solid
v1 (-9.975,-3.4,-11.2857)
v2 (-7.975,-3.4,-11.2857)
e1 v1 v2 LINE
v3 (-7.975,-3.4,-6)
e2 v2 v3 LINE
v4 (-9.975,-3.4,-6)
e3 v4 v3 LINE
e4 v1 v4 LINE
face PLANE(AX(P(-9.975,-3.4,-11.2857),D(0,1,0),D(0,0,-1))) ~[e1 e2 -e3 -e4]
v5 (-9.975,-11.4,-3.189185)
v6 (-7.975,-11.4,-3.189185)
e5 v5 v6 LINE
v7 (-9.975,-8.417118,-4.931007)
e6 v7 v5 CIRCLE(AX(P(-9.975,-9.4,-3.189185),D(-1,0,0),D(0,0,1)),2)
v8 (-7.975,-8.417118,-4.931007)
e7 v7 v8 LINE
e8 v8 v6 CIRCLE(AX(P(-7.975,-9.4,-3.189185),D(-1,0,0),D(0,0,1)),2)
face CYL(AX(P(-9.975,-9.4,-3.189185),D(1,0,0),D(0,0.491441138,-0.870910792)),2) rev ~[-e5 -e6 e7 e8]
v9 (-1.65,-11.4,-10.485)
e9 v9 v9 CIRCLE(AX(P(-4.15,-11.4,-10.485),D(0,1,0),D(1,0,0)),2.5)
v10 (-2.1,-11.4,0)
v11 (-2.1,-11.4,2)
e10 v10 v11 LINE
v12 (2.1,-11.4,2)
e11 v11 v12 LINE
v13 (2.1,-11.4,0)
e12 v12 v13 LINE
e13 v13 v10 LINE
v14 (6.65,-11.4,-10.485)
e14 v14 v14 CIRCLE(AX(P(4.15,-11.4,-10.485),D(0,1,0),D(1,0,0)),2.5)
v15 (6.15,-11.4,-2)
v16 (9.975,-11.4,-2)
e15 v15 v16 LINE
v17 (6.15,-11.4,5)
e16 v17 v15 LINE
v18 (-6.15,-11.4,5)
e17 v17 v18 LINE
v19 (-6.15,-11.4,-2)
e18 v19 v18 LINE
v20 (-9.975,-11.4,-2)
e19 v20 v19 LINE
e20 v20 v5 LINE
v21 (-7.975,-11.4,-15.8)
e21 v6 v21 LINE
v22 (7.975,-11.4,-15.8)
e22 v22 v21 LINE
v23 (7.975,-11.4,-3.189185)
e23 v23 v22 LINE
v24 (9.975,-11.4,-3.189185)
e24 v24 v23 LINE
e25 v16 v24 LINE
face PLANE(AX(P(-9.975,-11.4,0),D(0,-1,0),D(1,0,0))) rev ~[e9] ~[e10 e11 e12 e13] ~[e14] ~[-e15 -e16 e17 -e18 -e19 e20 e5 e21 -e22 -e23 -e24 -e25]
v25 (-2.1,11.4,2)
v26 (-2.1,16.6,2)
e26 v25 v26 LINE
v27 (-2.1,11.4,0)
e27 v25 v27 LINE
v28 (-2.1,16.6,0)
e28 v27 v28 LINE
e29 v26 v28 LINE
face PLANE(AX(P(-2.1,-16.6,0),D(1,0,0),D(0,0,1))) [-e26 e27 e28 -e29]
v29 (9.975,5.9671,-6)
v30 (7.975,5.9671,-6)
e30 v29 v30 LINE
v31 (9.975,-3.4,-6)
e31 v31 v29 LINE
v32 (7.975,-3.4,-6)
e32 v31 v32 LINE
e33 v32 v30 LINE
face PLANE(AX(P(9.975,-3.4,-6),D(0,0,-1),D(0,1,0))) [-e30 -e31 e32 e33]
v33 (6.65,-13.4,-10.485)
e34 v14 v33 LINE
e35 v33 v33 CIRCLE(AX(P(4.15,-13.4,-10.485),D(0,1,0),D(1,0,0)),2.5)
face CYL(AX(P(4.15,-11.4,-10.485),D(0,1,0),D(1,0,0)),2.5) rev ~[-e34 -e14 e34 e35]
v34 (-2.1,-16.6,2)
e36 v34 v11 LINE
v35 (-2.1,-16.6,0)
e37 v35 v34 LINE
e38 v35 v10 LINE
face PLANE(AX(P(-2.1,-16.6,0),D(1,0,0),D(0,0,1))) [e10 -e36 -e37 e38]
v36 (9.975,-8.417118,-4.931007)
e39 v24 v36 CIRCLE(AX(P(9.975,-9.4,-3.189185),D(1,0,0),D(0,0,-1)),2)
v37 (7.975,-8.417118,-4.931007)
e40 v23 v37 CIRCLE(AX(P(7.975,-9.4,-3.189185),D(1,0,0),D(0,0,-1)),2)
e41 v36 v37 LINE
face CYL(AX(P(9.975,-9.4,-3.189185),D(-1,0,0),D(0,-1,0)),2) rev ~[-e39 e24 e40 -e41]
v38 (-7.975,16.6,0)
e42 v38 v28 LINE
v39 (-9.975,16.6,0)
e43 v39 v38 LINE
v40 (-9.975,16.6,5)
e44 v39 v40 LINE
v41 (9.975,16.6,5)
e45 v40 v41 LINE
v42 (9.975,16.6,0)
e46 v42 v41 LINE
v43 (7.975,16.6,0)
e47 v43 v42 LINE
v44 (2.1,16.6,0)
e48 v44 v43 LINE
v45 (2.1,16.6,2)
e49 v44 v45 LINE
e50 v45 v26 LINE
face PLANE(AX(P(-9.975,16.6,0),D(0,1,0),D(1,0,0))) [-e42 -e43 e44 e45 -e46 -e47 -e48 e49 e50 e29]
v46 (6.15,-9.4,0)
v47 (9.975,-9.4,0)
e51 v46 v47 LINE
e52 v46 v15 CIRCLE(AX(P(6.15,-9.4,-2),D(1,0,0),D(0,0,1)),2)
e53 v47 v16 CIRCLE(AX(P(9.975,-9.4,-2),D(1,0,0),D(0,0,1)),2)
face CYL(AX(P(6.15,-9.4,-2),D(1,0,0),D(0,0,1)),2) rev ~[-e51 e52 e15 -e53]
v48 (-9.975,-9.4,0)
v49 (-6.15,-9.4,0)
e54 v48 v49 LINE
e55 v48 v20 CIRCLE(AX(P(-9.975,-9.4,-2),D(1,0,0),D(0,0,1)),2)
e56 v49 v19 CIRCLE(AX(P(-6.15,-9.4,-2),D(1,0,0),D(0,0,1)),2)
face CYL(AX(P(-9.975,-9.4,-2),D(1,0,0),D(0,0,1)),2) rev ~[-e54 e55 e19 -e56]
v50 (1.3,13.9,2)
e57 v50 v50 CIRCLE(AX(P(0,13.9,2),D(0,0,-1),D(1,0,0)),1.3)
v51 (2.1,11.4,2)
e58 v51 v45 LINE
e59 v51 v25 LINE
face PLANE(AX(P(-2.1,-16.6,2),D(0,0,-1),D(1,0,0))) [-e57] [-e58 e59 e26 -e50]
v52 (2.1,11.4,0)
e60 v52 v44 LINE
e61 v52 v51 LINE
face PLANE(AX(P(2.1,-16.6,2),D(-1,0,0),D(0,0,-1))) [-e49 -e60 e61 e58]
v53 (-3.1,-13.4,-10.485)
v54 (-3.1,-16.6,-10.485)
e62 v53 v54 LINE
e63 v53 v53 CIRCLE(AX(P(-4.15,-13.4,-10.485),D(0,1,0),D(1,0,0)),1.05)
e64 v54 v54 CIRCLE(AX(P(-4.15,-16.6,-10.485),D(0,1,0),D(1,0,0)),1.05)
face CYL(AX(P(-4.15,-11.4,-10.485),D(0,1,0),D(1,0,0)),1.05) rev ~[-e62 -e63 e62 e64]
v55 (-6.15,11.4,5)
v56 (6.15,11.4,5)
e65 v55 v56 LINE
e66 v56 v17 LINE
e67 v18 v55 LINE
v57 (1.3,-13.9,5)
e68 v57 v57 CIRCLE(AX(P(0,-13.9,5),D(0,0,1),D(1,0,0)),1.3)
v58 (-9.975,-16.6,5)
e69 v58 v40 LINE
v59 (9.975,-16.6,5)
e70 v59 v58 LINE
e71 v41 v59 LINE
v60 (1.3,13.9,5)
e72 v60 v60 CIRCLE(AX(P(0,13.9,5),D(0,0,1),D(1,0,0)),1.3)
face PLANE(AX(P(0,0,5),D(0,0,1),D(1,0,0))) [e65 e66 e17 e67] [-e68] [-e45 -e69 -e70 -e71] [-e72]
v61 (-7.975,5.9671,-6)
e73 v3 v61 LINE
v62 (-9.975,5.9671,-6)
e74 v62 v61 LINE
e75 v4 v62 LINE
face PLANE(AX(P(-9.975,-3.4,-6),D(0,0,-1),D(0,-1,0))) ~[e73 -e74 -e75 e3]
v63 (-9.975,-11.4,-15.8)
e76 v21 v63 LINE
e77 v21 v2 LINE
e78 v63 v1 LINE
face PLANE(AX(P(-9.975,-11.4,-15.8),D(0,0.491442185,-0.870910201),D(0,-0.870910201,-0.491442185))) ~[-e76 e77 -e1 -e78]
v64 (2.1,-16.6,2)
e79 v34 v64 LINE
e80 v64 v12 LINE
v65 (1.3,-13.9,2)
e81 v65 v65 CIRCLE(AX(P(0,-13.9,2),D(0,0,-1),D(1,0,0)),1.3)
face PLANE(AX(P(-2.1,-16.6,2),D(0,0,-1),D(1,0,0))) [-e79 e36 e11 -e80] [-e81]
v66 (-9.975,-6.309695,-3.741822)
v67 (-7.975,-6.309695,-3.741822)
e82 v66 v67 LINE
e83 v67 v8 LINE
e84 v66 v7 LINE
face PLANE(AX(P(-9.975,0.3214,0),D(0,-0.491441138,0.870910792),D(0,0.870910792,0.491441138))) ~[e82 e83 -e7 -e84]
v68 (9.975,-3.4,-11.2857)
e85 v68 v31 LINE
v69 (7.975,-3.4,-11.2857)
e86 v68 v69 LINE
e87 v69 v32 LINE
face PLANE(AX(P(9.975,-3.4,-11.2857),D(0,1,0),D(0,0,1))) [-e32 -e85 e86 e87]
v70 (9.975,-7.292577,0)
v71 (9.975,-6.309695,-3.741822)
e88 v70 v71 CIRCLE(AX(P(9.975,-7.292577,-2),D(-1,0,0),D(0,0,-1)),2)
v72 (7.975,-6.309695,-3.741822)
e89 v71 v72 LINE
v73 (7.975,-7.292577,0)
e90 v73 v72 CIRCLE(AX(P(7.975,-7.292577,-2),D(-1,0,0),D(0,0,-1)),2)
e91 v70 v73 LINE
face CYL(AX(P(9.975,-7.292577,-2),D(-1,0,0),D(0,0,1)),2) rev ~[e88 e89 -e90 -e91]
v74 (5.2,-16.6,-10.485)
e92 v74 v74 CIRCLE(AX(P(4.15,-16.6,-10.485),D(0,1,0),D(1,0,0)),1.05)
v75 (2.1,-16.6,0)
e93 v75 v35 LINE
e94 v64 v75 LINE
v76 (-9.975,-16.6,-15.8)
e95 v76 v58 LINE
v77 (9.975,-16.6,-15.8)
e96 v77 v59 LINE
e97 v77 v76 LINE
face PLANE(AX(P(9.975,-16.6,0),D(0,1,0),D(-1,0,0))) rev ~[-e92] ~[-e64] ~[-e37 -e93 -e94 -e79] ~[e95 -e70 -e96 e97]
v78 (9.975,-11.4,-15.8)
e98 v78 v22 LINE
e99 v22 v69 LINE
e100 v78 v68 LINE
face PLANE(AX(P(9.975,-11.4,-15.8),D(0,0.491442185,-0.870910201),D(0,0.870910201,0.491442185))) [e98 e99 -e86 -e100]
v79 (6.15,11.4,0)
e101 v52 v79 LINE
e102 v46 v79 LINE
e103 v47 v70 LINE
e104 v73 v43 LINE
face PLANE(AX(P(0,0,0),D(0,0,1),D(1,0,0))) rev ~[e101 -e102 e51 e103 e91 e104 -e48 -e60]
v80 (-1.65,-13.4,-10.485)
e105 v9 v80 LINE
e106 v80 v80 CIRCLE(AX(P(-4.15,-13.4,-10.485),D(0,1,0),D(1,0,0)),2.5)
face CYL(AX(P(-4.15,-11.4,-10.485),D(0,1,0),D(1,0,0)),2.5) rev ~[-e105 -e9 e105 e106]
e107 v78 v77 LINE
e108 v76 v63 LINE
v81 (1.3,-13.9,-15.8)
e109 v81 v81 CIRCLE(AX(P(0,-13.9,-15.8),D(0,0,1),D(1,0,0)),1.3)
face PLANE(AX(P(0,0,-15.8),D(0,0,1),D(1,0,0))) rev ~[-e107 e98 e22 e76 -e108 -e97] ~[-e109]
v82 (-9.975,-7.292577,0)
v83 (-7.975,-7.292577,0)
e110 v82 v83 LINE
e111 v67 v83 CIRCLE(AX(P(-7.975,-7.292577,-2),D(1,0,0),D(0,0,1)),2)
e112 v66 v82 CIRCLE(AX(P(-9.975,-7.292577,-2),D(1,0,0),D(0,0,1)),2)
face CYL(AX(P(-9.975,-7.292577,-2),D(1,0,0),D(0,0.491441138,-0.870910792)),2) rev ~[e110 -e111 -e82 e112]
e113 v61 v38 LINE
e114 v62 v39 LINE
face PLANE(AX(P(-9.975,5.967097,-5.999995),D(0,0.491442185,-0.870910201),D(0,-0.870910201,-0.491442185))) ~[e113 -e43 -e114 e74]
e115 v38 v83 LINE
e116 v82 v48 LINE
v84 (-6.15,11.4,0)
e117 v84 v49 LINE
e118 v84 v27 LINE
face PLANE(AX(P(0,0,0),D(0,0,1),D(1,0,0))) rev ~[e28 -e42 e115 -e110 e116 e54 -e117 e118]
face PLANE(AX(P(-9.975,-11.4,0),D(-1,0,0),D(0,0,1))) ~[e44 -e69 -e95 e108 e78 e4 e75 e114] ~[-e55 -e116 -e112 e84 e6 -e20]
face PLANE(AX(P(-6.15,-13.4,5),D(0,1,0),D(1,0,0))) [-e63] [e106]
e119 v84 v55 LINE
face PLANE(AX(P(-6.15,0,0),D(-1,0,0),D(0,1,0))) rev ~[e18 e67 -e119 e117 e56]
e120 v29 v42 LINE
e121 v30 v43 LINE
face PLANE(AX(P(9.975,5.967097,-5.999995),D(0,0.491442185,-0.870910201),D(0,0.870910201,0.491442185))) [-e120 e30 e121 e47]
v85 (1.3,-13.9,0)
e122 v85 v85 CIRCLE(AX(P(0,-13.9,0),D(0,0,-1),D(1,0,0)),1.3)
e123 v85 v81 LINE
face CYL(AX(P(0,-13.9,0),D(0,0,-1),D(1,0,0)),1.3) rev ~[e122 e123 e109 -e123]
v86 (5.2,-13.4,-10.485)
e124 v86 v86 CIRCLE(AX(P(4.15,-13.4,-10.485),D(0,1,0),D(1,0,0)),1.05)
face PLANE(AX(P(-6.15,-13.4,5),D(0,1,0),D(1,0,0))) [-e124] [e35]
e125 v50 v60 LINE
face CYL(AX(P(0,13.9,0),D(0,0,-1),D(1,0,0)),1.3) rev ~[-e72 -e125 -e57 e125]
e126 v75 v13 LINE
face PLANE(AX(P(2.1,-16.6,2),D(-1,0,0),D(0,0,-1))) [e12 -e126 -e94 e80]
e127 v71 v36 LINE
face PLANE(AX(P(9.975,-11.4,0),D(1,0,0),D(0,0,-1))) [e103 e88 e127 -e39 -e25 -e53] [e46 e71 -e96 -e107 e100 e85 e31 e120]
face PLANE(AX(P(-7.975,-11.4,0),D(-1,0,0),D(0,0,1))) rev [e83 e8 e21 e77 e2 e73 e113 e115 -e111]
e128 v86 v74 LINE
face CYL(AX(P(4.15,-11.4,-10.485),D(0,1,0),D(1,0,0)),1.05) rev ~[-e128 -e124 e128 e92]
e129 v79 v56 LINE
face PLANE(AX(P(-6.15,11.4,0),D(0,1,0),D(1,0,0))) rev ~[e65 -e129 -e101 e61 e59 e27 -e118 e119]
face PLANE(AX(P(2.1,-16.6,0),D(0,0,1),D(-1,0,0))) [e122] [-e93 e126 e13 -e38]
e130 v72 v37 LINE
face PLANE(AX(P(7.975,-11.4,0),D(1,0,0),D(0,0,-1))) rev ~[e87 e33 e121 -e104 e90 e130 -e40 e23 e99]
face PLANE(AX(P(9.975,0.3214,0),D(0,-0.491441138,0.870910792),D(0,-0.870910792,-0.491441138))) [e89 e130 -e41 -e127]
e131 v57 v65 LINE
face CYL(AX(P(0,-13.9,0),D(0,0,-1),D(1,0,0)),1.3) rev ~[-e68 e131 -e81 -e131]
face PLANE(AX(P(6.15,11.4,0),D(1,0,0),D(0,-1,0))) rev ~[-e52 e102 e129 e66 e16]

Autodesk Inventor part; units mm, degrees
ref_plane "YZ Plane" through (0, 0, 0) normal (1, 0, 0) x (0, 1, 0)
sketch "Sketch1" plane through (0, 0, 0) normal (0, 0, 1) x (1, 0, 0)
  line L0 (-9.975, 16.6) -> (9.975, 16.6)
  line L1 (9.975, 16.6) -> (9.975, -16.6)
  line L2 (9.975, -16.6) -> (-9.975, -16.6)
  line L3 (-9.975, -16.6) -> (-9.975, 16.6)
  line L4 (0, 0) -> (0, 11.4) construction
  line L5 (0, 0) -> (15.5803, 0) construction
  line L6 (-6.15, 11.4) -> (6.15, 11.4)
  line L7 (6.15, 11.4) -> (6.15, -11.4)
  line L8 (6.15, -11.4) -> (-6.15, -11.4)
  line L9 (-6.15, -11.4) -> (-6.15, 11.4)
  circle A0 centre (0, 13.9) radius 1.3
  circle A1 centre (0, -13.9) radius 1.3
  line L10 (-15.0861, 0) -> (20.6914, 0) projected
  line L11 (9.975, -16.6) -> (-9.975, -16.6)
  line L12 (-9.975, -16.6) -> (-9.975, -11.4)
  line L13 (-9.975, -11.4) -> (9.975, -11.4)
  line L14 (9.975, -11.4) -> (9.975, -16.6)
  line L15 (0, 11.4) -> (0, 13.9) construction
  point P0 (0, 16.6)
  dimension "d0" = 2.6
  dimension "d1" = 27.8
  dimension "d4" = 12.3
  dimension "d5" = 2.5
  dimension "d6" = 2.5
  dimension "d7" = 22.8
  dimension "d11" = 2.7
  dimension "d12" = 2.7
  dimension "d14" = 3.825
extrude "Extrusion1" add sketch "Sketch1" along normal blind 5 contours L0 L1 L10 L7 L6 L9 L3 | L10 L9 L13 L3 | L1 L13 L7 L10 | L13 L8 L1 L2 L3
extrude "Extrusion2" add sketch "Sketch1" against normal blind 15.8 contours L13 L8 L1 L2 L3
sketch "Sketch2" plane through (-6.15, -11.4, 5) normal (0, 1, 0) x (1, 0, 0)
  circle A0 centre (10.3, 15.485) radius 1.05
  circle A1 centre (2, 15.485) radius 1.05
  line L0 (-3.825, 20.8) -> (16.125, 20.8) projected
  line L1 (-3.825, 5) -> (-3.825, 20.8) projected
  line L2 (2, 15.485) -> (10.3, 15.485) construction
  line L3 (10.3, 15.485) -> (6.15, 15.485) construction
  line L4 (6.15, 15.485) -> (6.15, 20.8) construction
  point P0 (6.15, 5)
  dimension "d19" = 2.1
  dimension "d20" = 0
  dimension "d21" = 5.315
  dimension "d22" = 8.3
extrude "Extrusion3" cut sketch "Sketch2" against normal blind 10
sketch "Sketch3" plane through (-6.15, -11.4, 5) normal (0, 1, 0) x (1, 0, 0)
  circle A0 centre (10.3, 15.485) radius 1.05 projected
  circle A1 centre (10.3, 15.485) radius 2.5
  circle A2 centre (2, 15.485) radius 1.05 projected
  circle A3 centre (2, 15.485) radius 2.5
  point P0 (6.15, 5)
  dimension "d26" = 5
extrude "Extrusion4" cut sketch "Sketch3" against normal blind 2
sketch "Sketch4" plane through (9.975, -11.4, 0) normal (1, 0, 0) x (0, 0, -1)
  line L0 (0, 0) -> (15.8, 0) projected
  line L1 (0, 0) -> (0, 28) projected
  line L2 (15.8, 0) -> (0, 28)
  line L3 (0, 28) -> (0, 11.7214)
  line L4 (0, 11.7214) -> (6.6142, 0)
  line L5 (6.6142, 0) -> (15.8, 0)
  line L6 (0, 28) -> (-5, 28) projected
  line L7 (0, 11.7214) -> (0, 28)
  line L8 (6, 17.3671) -> (11.2857, 17.3671)
  line L9 (11.2857, 17.3671) -> (11.2857, 8)
  line L10 (11.2857, 8) -> (6, 8)
  line L11 (6, 8) -> (6, 17.3671)
  point P0 (0, 11.4)
  dimension "d29" = 8
  dimension "d33" = 8
  dimension "d34" = 6
ref_plane "Work Plane1" through (-1.325, -11.4, 0) normal (-1, 0, 0) x (0, 0, 1)
extrude "Extrusion5" add sketch "Sketch4" against normal blind 2 contours L4 L1 L2 L11 L10 L0
ref_plane "Work Plane3" through (0, -16.6, 5) normal (-1, 0, 0) x (0, 0, 1)
mirror "Mirror1" about plane through (0, -16.6, 5) normal (-1, 0, 0) of "Extrusion5"
fillet "Fillet1" radius 2 6 edges at (8.975, 0.3214, 0) (8.975, -11.4, -6.6142) (8.0625, -11.4, 0) (-8.975, -11.4, -6.6142) (-8.0625, -11.4, 0) (-8.975, 0.3214, 0)
sketch "Sketch5" plane through (-9.975, -16.6, 5) normal (0, -1, 0) x (1, 0, 0)
  line L0 (0, 0) -> (19.95, 0) projected
  line L1 (7.875, -3) -> (12.075, -3)
  line L2 (12.075, -3) -> (12.075, -5)
  line L3 (12.075, -5) -> (7.875, -5)
  line L4 (7.875, -5) -> (7.875, -3)
  line L5 (9.975, 0) -> (9.975, -3) construction
  point P0 (9.975, -5)
  dimension "d39" = 4.2
  dimension "d40" = 3
  dimension "d41" = 2
extrude "Extrusion7" cut sketch "Sketch5" against normal through all
properties part number "GrabberServoHolder_3DPrint"
